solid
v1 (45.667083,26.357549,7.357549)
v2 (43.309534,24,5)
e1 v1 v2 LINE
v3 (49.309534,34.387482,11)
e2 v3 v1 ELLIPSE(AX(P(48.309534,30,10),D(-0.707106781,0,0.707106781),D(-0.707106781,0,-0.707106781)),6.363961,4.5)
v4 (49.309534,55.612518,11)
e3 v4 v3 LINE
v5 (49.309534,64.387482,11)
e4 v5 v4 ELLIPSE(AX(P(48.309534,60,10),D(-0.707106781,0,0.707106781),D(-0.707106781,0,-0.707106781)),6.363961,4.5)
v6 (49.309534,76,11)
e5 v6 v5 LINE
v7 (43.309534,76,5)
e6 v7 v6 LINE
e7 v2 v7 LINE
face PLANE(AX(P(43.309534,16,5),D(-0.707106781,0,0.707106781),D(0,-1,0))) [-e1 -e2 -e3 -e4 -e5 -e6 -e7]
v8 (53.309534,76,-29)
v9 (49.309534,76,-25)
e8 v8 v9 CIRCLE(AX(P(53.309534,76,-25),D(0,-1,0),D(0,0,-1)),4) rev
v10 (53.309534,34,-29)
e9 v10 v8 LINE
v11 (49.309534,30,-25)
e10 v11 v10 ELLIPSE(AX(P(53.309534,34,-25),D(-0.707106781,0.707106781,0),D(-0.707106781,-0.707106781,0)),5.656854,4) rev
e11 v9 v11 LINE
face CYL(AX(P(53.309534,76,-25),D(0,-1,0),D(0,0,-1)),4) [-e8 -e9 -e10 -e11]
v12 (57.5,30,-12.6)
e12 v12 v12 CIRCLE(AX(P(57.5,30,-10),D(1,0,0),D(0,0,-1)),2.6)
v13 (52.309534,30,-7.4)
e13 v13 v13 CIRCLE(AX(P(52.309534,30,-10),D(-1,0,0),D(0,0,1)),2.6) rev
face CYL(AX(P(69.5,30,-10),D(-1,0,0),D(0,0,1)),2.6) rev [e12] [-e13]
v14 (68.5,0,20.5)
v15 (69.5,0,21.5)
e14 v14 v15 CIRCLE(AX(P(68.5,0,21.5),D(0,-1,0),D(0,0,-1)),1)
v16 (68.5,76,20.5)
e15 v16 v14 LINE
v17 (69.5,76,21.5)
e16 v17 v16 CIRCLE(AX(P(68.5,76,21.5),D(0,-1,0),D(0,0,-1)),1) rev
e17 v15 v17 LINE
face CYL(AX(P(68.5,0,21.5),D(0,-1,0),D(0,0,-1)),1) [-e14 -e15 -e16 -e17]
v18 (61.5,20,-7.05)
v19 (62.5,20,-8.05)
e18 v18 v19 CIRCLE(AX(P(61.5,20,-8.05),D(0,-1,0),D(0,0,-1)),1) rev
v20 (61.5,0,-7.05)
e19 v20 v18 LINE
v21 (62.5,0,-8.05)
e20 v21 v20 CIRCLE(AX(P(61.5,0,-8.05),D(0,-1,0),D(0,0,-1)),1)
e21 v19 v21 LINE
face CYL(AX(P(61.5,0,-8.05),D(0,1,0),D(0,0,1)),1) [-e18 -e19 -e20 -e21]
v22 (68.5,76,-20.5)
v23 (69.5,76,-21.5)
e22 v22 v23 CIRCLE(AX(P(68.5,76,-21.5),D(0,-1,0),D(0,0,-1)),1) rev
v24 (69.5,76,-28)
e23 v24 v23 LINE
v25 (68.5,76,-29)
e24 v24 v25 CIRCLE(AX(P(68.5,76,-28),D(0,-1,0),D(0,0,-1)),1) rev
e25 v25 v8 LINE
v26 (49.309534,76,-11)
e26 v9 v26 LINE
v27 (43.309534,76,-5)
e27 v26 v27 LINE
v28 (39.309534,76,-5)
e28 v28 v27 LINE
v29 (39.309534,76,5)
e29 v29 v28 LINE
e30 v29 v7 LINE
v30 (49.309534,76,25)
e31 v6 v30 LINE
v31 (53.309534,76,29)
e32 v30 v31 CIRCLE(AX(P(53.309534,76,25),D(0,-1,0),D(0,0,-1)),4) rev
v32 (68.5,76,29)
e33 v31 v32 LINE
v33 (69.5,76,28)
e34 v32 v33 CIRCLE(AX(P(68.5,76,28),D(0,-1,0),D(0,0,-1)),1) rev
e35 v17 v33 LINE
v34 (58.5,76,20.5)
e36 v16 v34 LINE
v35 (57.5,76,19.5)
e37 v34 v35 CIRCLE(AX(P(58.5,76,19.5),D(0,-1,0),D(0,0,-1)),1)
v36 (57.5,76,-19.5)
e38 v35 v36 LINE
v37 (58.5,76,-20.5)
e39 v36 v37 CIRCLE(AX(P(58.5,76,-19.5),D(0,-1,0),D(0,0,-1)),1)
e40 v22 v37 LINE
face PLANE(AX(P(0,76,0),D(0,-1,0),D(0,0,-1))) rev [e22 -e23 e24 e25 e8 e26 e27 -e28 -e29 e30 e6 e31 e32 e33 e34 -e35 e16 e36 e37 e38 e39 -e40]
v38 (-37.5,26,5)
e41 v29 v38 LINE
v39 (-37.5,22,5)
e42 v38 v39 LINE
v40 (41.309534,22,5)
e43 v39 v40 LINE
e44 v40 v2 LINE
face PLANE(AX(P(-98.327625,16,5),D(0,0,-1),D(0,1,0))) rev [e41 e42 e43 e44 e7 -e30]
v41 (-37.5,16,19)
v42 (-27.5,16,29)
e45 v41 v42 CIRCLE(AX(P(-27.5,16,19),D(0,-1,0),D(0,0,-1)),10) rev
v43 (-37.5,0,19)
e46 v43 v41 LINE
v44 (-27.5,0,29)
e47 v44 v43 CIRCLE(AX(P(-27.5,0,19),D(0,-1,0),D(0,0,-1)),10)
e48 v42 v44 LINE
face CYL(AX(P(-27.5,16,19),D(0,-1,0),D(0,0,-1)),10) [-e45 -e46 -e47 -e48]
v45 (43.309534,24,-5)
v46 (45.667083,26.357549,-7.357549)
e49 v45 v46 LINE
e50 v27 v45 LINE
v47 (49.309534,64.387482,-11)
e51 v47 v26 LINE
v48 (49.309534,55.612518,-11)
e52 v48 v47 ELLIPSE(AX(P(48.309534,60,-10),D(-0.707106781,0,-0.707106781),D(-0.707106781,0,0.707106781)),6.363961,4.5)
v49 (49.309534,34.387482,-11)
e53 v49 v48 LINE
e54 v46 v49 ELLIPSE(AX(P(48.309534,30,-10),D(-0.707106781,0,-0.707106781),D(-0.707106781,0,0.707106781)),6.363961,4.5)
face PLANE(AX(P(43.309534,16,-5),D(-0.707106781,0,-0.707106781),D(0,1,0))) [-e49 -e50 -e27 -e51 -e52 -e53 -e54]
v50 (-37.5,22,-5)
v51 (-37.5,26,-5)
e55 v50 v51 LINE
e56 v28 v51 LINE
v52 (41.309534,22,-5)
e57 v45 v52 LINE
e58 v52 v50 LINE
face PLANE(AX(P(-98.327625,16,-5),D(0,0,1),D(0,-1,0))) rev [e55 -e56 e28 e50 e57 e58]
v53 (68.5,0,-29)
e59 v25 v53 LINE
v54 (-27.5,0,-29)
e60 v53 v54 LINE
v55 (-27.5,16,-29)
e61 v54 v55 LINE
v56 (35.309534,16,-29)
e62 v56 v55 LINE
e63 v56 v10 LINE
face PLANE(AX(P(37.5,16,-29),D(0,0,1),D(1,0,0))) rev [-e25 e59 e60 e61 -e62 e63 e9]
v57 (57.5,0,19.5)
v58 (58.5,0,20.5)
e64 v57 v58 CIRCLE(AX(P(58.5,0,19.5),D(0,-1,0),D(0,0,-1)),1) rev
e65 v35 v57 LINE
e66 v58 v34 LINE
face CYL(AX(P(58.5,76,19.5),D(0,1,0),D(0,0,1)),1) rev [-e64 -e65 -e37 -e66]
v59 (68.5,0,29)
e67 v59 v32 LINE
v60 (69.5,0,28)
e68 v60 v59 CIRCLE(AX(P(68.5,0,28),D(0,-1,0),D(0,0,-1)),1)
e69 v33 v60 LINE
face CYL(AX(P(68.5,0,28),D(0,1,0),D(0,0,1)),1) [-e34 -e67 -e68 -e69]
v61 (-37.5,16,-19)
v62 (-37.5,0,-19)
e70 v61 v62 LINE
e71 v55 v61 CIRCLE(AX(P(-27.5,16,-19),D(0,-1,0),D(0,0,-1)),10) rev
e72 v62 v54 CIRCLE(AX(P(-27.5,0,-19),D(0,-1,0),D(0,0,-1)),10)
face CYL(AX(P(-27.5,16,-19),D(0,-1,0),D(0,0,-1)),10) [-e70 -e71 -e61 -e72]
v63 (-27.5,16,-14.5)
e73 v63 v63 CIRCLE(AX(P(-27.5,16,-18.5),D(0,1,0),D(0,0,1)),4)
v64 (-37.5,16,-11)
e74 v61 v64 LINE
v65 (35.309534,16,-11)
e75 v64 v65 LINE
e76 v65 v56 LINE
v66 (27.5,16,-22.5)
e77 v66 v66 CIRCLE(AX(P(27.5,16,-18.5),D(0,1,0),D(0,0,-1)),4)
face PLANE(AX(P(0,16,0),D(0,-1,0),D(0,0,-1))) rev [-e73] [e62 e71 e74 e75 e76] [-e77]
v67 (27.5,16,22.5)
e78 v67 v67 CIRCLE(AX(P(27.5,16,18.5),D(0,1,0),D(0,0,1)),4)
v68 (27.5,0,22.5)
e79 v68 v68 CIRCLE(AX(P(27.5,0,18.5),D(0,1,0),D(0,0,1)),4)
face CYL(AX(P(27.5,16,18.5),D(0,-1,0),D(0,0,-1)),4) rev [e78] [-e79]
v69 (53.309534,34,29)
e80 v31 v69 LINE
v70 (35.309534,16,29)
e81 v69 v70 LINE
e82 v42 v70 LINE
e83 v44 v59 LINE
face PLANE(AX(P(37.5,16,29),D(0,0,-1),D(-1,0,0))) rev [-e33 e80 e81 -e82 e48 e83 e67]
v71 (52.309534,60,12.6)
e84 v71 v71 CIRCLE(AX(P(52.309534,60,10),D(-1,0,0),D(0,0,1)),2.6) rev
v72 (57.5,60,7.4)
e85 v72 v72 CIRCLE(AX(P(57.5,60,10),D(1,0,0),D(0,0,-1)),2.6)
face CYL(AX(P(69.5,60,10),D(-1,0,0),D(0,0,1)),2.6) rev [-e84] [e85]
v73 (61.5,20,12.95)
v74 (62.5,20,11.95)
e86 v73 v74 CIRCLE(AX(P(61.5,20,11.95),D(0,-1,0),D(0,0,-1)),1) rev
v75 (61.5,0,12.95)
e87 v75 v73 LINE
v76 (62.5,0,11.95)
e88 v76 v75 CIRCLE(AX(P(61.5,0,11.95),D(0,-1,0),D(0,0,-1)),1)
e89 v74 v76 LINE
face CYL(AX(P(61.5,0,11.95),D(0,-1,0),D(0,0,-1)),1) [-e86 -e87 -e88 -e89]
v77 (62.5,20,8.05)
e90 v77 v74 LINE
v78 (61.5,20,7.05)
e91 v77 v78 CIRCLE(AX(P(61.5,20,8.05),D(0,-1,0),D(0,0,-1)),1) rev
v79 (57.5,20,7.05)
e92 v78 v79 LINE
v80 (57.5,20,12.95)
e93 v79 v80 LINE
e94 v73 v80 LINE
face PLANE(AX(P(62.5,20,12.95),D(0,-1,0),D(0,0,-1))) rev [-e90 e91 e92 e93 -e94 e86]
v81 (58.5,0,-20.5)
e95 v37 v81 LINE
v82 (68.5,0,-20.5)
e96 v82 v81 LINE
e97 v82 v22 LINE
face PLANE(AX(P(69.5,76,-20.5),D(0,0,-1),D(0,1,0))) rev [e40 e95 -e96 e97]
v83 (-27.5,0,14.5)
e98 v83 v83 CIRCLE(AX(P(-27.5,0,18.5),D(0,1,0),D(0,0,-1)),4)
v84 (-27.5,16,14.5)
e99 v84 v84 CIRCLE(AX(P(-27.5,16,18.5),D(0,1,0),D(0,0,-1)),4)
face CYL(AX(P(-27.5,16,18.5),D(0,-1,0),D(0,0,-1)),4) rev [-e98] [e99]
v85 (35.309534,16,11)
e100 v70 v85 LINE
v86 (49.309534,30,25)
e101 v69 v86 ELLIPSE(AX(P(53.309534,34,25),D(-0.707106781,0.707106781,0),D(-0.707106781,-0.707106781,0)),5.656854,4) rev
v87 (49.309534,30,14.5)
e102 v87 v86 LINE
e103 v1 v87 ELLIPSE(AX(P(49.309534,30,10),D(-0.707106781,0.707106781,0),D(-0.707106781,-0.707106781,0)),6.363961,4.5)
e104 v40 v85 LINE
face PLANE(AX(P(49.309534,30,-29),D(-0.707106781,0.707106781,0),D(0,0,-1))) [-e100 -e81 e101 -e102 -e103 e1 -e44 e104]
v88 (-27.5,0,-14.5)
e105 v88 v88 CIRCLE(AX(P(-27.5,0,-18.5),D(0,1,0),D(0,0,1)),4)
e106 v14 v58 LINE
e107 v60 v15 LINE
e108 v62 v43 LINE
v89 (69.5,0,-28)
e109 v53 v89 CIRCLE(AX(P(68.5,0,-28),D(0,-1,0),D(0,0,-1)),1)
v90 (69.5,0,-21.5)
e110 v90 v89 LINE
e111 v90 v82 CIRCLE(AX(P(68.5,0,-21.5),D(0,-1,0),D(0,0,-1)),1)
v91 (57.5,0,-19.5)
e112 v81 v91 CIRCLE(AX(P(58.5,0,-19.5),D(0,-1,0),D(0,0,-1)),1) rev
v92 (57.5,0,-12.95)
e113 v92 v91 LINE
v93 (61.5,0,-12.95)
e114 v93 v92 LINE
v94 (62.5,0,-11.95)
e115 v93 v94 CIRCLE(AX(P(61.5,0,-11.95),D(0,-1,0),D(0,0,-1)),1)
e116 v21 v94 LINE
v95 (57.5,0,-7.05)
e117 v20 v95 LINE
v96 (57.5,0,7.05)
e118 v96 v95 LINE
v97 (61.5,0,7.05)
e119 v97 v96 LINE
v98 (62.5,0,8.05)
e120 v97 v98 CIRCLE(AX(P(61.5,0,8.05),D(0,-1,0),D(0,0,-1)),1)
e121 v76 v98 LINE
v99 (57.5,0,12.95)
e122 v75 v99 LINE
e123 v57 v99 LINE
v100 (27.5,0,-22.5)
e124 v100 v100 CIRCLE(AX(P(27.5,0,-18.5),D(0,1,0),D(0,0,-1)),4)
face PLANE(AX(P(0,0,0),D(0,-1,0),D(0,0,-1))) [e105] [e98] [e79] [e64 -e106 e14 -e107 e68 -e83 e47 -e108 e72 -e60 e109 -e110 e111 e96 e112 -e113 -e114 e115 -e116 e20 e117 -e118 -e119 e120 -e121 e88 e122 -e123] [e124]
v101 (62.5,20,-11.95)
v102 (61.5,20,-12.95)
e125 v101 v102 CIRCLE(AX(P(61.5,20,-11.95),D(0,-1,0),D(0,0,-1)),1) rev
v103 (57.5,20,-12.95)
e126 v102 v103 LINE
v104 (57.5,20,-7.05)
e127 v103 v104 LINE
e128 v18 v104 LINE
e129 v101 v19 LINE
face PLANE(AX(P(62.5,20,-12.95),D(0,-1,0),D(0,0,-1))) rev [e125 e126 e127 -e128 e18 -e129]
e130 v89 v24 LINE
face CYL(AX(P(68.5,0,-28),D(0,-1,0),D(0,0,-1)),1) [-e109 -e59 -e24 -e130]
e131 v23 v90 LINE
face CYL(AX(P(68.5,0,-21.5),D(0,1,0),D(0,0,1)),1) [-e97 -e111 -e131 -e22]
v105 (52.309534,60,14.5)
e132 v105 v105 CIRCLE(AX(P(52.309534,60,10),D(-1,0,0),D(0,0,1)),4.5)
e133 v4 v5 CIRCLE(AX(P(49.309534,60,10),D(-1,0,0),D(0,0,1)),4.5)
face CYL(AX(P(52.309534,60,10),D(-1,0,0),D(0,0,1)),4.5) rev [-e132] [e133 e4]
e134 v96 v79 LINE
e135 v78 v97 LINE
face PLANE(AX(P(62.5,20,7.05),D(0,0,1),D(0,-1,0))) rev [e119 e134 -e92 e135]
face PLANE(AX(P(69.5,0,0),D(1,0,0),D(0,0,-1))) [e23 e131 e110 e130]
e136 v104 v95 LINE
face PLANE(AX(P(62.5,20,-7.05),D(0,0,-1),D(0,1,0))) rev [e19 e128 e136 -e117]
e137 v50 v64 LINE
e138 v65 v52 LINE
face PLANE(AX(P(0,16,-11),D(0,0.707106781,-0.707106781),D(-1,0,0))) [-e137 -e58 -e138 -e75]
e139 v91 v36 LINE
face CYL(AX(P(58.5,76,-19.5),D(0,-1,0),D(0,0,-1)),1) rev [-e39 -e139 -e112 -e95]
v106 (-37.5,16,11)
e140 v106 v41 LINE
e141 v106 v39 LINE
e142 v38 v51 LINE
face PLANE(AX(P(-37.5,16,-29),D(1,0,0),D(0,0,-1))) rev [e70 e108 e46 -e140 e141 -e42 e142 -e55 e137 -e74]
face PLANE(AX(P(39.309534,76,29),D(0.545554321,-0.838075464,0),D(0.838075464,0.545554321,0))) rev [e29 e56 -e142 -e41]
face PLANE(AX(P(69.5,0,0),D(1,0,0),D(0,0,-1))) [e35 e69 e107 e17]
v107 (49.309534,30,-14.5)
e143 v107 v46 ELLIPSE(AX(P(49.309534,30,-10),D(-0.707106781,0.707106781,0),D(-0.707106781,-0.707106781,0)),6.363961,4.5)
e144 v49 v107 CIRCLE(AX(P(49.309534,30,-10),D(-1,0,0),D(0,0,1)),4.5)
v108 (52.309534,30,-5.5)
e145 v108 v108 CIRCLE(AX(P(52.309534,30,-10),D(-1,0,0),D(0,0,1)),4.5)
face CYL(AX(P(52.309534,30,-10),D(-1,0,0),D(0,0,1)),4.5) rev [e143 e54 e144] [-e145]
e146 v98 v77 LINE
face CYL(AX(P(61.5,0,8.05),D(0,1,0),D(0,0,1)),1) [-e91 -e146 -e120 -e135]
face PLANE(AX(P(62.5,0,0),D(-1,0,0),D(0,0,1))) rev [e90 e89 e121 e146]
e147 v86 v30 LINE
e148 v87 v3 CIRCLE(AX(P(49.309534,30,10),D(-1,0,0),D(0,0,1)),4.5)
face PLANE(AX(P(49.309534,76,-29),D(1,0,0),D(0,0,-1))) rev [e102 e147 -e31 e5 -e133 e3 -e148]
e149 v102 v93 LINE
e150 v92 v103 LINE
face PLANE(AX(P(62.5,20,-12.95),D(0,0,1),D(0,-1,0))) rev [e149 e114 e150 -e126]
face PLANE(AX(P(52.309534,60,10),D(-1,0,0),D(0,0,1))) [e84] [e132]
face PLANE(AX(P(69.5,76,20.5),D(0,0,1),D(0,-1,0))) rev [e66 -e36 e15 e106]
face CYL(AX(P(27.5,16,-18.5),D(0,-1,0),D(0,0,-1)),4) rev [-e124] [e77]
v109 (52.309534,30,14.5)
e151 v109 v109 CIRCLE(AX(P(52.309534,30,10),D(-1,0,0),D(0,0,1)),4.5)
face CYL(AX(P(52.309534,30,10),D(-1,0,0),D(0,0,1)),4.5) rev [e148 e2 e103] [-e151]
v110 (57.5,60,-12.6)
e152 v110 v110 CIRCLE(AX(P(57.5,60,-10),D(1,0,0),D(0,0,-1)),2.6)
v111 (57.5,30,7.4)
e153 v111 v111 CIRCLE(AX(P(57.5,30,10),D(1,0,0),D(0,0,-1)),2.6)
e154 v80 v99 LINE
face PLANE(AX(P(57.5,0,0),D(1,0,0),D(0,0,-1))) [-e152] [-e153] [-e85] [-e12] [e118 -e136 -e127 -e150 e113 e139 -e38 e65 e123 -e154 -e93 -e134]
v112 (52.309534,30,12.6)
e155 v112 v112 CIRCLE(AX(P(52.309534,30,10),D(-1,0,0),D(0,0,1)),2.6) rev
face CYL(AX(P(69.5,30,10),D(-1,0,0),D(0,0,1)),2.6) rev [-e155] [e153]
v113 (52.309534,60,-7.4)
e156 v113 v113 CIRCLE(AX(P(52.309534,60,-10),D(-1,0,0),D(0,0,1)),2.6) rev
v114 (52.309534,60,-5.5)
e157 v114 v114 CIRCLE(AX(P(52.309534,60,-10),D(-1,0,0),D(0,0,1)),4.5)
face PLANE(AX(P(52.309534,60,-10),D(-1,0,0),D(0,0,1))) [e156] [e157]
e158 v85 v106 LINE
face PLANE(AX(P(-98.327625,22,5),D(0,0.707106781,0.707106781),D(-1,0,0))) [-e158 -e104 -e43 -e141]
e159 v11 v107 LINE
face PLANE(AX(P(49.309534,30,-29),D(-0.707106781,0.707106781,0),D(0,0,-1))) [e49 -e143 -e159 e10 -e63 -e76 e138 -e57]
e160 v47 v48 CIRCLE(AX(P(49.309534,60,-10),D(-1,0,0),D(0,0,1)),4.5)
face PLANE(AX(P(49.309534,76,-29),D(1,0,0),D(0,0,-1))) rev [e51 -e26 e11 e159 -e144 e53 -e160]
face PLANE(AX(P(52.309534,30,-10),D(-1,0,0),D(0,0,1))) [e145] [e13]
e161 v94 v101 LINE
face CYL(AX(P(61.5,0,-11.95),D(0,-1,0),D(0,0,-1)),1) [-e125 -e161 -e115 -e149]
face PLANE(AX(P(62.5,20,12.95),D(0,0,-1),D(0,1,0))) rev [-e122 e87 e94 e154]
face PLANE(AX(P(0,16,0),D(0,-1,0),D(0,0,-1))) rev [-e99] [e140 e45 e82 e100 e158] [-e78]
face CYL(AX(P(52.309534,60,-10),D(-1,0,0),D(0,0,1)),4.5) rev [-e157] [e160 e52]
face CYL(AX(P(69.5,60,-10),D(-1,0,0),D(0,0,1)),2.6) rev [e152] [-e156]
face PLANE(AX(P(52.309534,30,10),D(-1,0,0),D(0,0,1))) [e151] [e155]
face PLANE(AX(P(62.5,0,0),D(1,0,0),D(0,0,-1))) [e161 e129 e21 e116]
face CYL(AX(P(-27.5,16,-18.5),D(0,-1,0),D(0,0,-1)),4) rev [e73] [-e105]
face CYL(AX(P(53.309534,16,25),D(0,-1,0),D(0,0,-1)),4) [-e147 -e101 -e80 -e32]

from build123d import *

# Parameters (mm, degrees)
ESQUISSE1_W             = 75
ESQUISSE1_H             = 58
ESQUISSE1_R             = 4
BOSS_EXTRU_1_DEPTH      = 16
ESQUISSE2_W             = 58
ESQUISSE2_H             = 16
BOSS_EXTRU_2_DEPTH      = 20
ESQUISSE3_W             = 8.190465892
ESQUISSE3_H             = 58
BOSS_EXTRU_3_DEPTH      = 60
ESQUISSE4_W             = 8.5
ESQUISSE4_H             = 76
BOSS_EXTRU_4_DEPTH      = 12
ESQUISSE5_W             = 5.9
ESQUISSE5_H             = 20
BOSS_EXTRU_5_DEPTH      = 5
ESQUISSE6_W             = 10
ESQUISSE6_H             = 60
BOSS_EXTRU_6_DEPTH      = 86.809534108
ESQUISSE7_R             = 2.6
ENL_V_MAT_EXTRU_1_DEPTH = 119.965941395
ESQUISSE8_R             = 4.5
ENL_V_MAT_EXTRU_2_DEPTH = 3
ENL_V_MAT_EXTRU_3_DEPTH = 109.45390726
CHANFREIN1_SIZE         = 14
CHANFREIN2_SIZE         = 6
CHANFREIN3_SIZE         = 6
CONG_1_R                = 10
CONG_2_R                = 4
CONG_3_R                = 1
CONG_4_R                = 1


with BuildPart() as part:
    # Esquisse1 → Boss.-Extru.1 (new body)
    with BuildSketch(Plane(origin=(0, 0, 0), x_dir=(1, 0, 0), z_dir=(0, 1, 0))):
        Rectangle(ESQUISSE1_W, ESQUISSE1_H)
        with Locations(Location((-27.5, 18.5, 0), (0, 0, 270))):
            Circle(ESQUISSE1_R, mode=Mode.SUBTRACT)
        with Locations(Location((27.5, 18.5, 0), (0, 0, 90))):
            Circle(ESQUISSE1_R, mode=Mode.SUBTRACT)
        with Locations(Location((27.5, -18.5, 0), (0, 0, 270))):
            Circle(ESQUISSE1_R, mode=Mode.SUBTRACT)
        with Locations(Location((-27.5, -18.5, 0), (0, 0, 90))):
            Circle(ESQUISSE1_R, mode=Mode.SUBTRACT)
    extrude(amount=BOSS_EXTRU_1_DEPTH)

    # Esquisse2 → Boss.-Extru.2 (add)
    with BuildSketch(Plane(origin=(37.5, 0, 0), x_dir=(0, 0, -1), z_dir=(1, 0, 0))):
        with Locations((0, 8)):
            Rectangle(ESQUISSE2_W, ESQUISSE2_H)
    extrude(amount=BOSS_EXTRU_2_DEPTH)

    # Esquisse3 → Boss.-Extru.3 (add)
    with BuildSketch(Plane(origin=(0, 16, 0), x_dir=(1, 0, 0), z_dir=(0, 1, 0))):
        with Locations((53.404767054, 0)):
            Rectangle(ESQUISSE3_W, ESQUISSE3_H)
    extrude(amount=BOSS_EXTRU_3_DEPTH)

    # Esquisse4 → Boss.-Extru.4 (add)
    with BuildSketch(Plane(origin=(57.5, 0, 0), x_dir=(0, 0, -1), z_dir=(1, 0, 0))):
        with Locations((24.75, 38)):
            Rectangle(ESQUISSE4_W, ESQUISSE4_H)
        with Locations((-24.75, 38)):
            Rectangle(ESQUISSE4_W, ESQUISSE4_H)
    extrude(amount=BOSS_EXTRU_4_DEPTH)

    # Esquisse5 → Boss.-Extru.5 (add)
    with BuildSketch(Plane(origin=(57.5, 0, 0), x_dir=(0, 0, -1), z_dir=(1, 0, 0))):
        with Locations((-10, 10)):
            Rectangle(ESQUISSE5_W, ESQUISSE5_H)
        with Locations((10, 10)):
            Rectangle(ESQUISSE5_W, ESQUISSE5_H)
    extrude(amount=BOSS_EXTRU_5_DEPTH)

    # Esquisse6 → Boss.-Extru.6 (add)
    with BuildSketch(Plane.ZY.offset(-49.309534108)):
        with Locations((0, 46)):
            Rectangle(ESQUISSE6_W, ESQUISSE6_H)
    extrude(amount=BOSS_EXTRU_6_DEPTH)

    # Esquisse7 → Enlèv. mat.-Extru.1 (cut, through all)
    with BuildSketch(Plane.ZY.offset(-49.309534108)):
        with Locations((-10, 60)):
            Circle(ESQUISSE7_R)
        with Locations((-10, 30)):
            Circle(ESQUISSE7_R)
        with Locations(Location((10, 30, 0), (0, 0, 180))):
            Circle(ESQUISSE7_R)
        with Locations(Location((10, 60, 0), (0, 0, 180))):
            Circle(ESQUISSE7_R)
    extrude(amount=-ENL_V_MAT_EXTRU_1_DEPTH, mode=Mode.SUBTRACT)

    # Esquisse8 → Enlèv. mat.-Extru.2 (cut)
    with BuildSketch(Plane.ZY.offset(-49.309534108)):
        with Locations((-10, 60)):
            Circle(ESQUISSE8_R)
        with Locations((-10, 30)):
            Circle(ESQUISSE8_R)
        with Locations((10, 60)):
            Circle(ESQUISSE8_R)
        with Locations((10, 30)):
            Circle(ESQUISSE8_R)
    extrude(amount=-ENL_V_MAT_EXTRU_2_DEPTH, mode=Mode.SUBTRACT)

    # Esquisse9 → Enlèv. mat.-Extru.3 (cut, through all)
    with BuildSketch(Plane(origin=(0, 0, -5), x_dir=(-1, 0, 0), z_dir=(0, 0, -1))):
        Polygon((-39.309534108, 76), (37.5, 26), (37.5, 76), align=None)
    extrude(amount=-ENL_V_MAT_EXTRU_3_DEPTH, mode=Mode.SUBTRACT)

    # Chanfrein1
    # the kernel refuses this chamfer: 14 mm, written as the material it adds along each edge
    with BuildSketch(Plane(origin=(49.309534108, 16, -31.003561832), x_dir=(-0.9996219169112968, -0.027495876610586358, 0), z_dir=(0, 0, 1))) as chanfrein1_piece_1_section:
        Polygon((CHANFREIN1_SIZE * 0.999621916911, -CHANFREIN1_SIZE * 0.0274958766106), (-CHANFREIN1_SIZE * 0.0274958766106, -CHANFREIN1_SIZE * 0.999621916911), (0, 0), align=None)
    chanfrein1_piece_1 = extrude(amount=60.003561832, mode=Mode.PRIVATE)
    chanfrein1_piece_1 = split(chanfrein1_piece_1, bisect_by=Plane(origin=(44.612270729, 20.464073152, -29), z_dir=(0, 0, 1)), keep=Keep.TOP, mode=Mode.PRIVATE)
    chanfrein1_piece_1 = chanfrein1_piece_1 - Plane(origin=(44.612270729, 30, -10), x_dir=(0, 0, 1), z_dir=(-1, 0, 0)) * Cylinder(4.5, 176, mode=Mode.PRIVATE)
    chanfrein1_piece_1 = chanfrein1_piece_1 - Plane(origin=(44.612270729, 30, 10), x_dir=(0, 0, 1), z_dir=(-1, 0, 0)) * Cylinder(4.5, 176, mode=Mode.PRIVATE)
    add(chanfrein1_piece_1)
    with BuildSketch(Plane(origin=(49.309534108, 16, -29), x_dir=(0.02749587661058661, 0.9996219169112968, 0), z_dir=(0, 0, 1))) as chanfrein1_piece_2_section:
        Polygon((CHANFREIN1_SIZE * 0.999621916911, CHANFREIN1_SIZE * 0.0274958766106), (-CHANFREIN1_SIZE * 0.0274958766106, CHANFREIN1_SIZE * 0.999621916911), (0, 0), align=None)
    chanfrein1_piece_2 = extrude(amount=60.003561832, mode=Mode.PRIVATE)
    chanfrein1_piece_2 = chanfrein1_piece_2 - Plane(origin=(44.577827309, 30, -10), x_dir=(0, 0, 1), z_dir=(-1, 0, 0)) * Cylinder(4.5, 176, mode=Mode.PRIVATE)
    chanfrein1_piece_2 = split(chanfrein1_piece_2, bisect_by=Plane(origin=(44.577827309, 20.39830905, 29), z_dir=(0, 0, -1)), keep=Keep.TOP, mode=Mode.PRIVATE)
    chanfrein1_piece_2 = chanfrein1_piece_2 - Plane(origin=(44.577827309, 30, 10), x_dir=(0, 0, 1), z_dir=(-1, 0, 0)) * Cylinder(4.5, 176, mode=Mode.PRIVATE)
    add(chanfrein1_piece_2)

    # Chanfrein2
    chanfrein2_edges = [part.edges().sort_by_distance(p)[0] for p in [
        (-1.095232946, 16, 5),
        (-1.095232946, 16, -5),
    ]]
    chamfer(chanfrein2_edges, length=CHANFREIN2_SIZE)

    # Chanfrein3
    # the kernel refuses this chamfer: 6 mm, written as the material it adds along each edge
    with BuildSketch(Plane(origin=(49.309534108, 76, 5), x_dir=(-0.9996219169112968, 0, -0.027495876610586334), z_dir=(0, -1, 0))) as chanfrein3_piece_1_section:
        Polygon((CHANFREIN3_SIZE * 0.999621916911, -CHANFREIN3_SIZE * 0.0274958766106), (-CHANFREIN3_SIZE * 0.0274958766106, -CHANFREIN3_SIZE * 0.999621916911), (0, 0), align=None)
    chanfrein3_piece_1 = extrude(amount=61.430097928, mode=Mode.PRIVATE)
    chanfrein3_piece_1 = chanfrein3_piece_1 - Plane(origin=(47.194482269, 30, 10), x_dir=(0, 0, 1), z_dir=(-1, 0, 0)) * Cylinder(4.5, 147, mode=Mode.PRIVATE)
    chanfrein3_piece_1 = chanfrein3_piece_1 - Plane(origin=(47.194482269, 60, 10), x_dir=(0, 0, 1), z_dir=(-1, 0, 0)) * Cylinder(4.5, 147, mode=Mode.PRIVATE)
    add(chanfrein3_piece_1)
    with BuildSketch(Plane(origin=(49.309534108, 14.569902072, -5), x_dir=(-0.9996219169112968, 0, 0.027495876610586334), z_dir=(0, 1, 0))) as chanfrein3_piece_2_section:
        Polygon((CHANFREIN3_SIZE * 0.999621916911, -CHANFREIN3_SIZE * 0.0274958766106), (-CHANFREIN3_SIZE * 0.0274958766106, -CHANFREIN3_SIZE * 0.999621916911), (0, 0), align=None)
    chanfrein3_piece_2 = extrude(amount=61.430097928, mode=Mode.PRIVATE)
    chanfrein3_piece_2 = chanfrein3_piece_2 - Plane(origin=(47.377575529, 30, -10), x_dir=(0, 0, 1), z_dir=(-1, 0, 0)) * Cylinder(4.5, 147, mode=Mode.PRIVATE)
    chanfrein3_piece_2 = chanfrein3_piece_2 - Plane(origin=(47.377575529, 60, -10), x_dir=(0, 0, 1), z_dir=(-1, 0, 0)) * Cylinder(4.5, 147, mode=Mode.PRIVATE)
    add(chanfrein3_piece_2)

    # Congé1
    cong_1_edges = [part.edges().sort_by_distance(p)[0] for p in [
        (-37.5, 8, -29),
        (-37.5, 8, 29),
    ]]
    fillet(cong_1_edges, radius=CONG_1_R)

    # Congé2
    cong_2_edges = [part.edges().sort_by_distance(p)[0] for p in [
        (49.309534108, 53, -29),
        (49.309534108, 53, 29),
    ]]
    fillet(cong_2_edges, radius=CONG_2_R)

    # Congé3
    cong_3_edges = [part.edges().sort_by_distance(p)[0] for p in [
        (69.5, 38, 29),
        (69.5, 38, 20.5),
        (69.5, 38, -20.5),
        (69.5, 38, -29),
    ]]
    fillet(cong_3_edges, radius=CONG_3_R)

    # Congé4
    cong_4_edges = [part.edges().sort_by_distance(p)[0] for p in [
        (57.5, 38, 20.5),
        (57.5, 38, -20.5),
        (62.5, 10, 12.95),
        (62.5, 10, 7.05),
        (62.5, 10, -7.05),
        (62.5, 10, -12.95),
    ]]
    fillet(cong_4_edges, radius=CONG_4_R)


solid = part.part
